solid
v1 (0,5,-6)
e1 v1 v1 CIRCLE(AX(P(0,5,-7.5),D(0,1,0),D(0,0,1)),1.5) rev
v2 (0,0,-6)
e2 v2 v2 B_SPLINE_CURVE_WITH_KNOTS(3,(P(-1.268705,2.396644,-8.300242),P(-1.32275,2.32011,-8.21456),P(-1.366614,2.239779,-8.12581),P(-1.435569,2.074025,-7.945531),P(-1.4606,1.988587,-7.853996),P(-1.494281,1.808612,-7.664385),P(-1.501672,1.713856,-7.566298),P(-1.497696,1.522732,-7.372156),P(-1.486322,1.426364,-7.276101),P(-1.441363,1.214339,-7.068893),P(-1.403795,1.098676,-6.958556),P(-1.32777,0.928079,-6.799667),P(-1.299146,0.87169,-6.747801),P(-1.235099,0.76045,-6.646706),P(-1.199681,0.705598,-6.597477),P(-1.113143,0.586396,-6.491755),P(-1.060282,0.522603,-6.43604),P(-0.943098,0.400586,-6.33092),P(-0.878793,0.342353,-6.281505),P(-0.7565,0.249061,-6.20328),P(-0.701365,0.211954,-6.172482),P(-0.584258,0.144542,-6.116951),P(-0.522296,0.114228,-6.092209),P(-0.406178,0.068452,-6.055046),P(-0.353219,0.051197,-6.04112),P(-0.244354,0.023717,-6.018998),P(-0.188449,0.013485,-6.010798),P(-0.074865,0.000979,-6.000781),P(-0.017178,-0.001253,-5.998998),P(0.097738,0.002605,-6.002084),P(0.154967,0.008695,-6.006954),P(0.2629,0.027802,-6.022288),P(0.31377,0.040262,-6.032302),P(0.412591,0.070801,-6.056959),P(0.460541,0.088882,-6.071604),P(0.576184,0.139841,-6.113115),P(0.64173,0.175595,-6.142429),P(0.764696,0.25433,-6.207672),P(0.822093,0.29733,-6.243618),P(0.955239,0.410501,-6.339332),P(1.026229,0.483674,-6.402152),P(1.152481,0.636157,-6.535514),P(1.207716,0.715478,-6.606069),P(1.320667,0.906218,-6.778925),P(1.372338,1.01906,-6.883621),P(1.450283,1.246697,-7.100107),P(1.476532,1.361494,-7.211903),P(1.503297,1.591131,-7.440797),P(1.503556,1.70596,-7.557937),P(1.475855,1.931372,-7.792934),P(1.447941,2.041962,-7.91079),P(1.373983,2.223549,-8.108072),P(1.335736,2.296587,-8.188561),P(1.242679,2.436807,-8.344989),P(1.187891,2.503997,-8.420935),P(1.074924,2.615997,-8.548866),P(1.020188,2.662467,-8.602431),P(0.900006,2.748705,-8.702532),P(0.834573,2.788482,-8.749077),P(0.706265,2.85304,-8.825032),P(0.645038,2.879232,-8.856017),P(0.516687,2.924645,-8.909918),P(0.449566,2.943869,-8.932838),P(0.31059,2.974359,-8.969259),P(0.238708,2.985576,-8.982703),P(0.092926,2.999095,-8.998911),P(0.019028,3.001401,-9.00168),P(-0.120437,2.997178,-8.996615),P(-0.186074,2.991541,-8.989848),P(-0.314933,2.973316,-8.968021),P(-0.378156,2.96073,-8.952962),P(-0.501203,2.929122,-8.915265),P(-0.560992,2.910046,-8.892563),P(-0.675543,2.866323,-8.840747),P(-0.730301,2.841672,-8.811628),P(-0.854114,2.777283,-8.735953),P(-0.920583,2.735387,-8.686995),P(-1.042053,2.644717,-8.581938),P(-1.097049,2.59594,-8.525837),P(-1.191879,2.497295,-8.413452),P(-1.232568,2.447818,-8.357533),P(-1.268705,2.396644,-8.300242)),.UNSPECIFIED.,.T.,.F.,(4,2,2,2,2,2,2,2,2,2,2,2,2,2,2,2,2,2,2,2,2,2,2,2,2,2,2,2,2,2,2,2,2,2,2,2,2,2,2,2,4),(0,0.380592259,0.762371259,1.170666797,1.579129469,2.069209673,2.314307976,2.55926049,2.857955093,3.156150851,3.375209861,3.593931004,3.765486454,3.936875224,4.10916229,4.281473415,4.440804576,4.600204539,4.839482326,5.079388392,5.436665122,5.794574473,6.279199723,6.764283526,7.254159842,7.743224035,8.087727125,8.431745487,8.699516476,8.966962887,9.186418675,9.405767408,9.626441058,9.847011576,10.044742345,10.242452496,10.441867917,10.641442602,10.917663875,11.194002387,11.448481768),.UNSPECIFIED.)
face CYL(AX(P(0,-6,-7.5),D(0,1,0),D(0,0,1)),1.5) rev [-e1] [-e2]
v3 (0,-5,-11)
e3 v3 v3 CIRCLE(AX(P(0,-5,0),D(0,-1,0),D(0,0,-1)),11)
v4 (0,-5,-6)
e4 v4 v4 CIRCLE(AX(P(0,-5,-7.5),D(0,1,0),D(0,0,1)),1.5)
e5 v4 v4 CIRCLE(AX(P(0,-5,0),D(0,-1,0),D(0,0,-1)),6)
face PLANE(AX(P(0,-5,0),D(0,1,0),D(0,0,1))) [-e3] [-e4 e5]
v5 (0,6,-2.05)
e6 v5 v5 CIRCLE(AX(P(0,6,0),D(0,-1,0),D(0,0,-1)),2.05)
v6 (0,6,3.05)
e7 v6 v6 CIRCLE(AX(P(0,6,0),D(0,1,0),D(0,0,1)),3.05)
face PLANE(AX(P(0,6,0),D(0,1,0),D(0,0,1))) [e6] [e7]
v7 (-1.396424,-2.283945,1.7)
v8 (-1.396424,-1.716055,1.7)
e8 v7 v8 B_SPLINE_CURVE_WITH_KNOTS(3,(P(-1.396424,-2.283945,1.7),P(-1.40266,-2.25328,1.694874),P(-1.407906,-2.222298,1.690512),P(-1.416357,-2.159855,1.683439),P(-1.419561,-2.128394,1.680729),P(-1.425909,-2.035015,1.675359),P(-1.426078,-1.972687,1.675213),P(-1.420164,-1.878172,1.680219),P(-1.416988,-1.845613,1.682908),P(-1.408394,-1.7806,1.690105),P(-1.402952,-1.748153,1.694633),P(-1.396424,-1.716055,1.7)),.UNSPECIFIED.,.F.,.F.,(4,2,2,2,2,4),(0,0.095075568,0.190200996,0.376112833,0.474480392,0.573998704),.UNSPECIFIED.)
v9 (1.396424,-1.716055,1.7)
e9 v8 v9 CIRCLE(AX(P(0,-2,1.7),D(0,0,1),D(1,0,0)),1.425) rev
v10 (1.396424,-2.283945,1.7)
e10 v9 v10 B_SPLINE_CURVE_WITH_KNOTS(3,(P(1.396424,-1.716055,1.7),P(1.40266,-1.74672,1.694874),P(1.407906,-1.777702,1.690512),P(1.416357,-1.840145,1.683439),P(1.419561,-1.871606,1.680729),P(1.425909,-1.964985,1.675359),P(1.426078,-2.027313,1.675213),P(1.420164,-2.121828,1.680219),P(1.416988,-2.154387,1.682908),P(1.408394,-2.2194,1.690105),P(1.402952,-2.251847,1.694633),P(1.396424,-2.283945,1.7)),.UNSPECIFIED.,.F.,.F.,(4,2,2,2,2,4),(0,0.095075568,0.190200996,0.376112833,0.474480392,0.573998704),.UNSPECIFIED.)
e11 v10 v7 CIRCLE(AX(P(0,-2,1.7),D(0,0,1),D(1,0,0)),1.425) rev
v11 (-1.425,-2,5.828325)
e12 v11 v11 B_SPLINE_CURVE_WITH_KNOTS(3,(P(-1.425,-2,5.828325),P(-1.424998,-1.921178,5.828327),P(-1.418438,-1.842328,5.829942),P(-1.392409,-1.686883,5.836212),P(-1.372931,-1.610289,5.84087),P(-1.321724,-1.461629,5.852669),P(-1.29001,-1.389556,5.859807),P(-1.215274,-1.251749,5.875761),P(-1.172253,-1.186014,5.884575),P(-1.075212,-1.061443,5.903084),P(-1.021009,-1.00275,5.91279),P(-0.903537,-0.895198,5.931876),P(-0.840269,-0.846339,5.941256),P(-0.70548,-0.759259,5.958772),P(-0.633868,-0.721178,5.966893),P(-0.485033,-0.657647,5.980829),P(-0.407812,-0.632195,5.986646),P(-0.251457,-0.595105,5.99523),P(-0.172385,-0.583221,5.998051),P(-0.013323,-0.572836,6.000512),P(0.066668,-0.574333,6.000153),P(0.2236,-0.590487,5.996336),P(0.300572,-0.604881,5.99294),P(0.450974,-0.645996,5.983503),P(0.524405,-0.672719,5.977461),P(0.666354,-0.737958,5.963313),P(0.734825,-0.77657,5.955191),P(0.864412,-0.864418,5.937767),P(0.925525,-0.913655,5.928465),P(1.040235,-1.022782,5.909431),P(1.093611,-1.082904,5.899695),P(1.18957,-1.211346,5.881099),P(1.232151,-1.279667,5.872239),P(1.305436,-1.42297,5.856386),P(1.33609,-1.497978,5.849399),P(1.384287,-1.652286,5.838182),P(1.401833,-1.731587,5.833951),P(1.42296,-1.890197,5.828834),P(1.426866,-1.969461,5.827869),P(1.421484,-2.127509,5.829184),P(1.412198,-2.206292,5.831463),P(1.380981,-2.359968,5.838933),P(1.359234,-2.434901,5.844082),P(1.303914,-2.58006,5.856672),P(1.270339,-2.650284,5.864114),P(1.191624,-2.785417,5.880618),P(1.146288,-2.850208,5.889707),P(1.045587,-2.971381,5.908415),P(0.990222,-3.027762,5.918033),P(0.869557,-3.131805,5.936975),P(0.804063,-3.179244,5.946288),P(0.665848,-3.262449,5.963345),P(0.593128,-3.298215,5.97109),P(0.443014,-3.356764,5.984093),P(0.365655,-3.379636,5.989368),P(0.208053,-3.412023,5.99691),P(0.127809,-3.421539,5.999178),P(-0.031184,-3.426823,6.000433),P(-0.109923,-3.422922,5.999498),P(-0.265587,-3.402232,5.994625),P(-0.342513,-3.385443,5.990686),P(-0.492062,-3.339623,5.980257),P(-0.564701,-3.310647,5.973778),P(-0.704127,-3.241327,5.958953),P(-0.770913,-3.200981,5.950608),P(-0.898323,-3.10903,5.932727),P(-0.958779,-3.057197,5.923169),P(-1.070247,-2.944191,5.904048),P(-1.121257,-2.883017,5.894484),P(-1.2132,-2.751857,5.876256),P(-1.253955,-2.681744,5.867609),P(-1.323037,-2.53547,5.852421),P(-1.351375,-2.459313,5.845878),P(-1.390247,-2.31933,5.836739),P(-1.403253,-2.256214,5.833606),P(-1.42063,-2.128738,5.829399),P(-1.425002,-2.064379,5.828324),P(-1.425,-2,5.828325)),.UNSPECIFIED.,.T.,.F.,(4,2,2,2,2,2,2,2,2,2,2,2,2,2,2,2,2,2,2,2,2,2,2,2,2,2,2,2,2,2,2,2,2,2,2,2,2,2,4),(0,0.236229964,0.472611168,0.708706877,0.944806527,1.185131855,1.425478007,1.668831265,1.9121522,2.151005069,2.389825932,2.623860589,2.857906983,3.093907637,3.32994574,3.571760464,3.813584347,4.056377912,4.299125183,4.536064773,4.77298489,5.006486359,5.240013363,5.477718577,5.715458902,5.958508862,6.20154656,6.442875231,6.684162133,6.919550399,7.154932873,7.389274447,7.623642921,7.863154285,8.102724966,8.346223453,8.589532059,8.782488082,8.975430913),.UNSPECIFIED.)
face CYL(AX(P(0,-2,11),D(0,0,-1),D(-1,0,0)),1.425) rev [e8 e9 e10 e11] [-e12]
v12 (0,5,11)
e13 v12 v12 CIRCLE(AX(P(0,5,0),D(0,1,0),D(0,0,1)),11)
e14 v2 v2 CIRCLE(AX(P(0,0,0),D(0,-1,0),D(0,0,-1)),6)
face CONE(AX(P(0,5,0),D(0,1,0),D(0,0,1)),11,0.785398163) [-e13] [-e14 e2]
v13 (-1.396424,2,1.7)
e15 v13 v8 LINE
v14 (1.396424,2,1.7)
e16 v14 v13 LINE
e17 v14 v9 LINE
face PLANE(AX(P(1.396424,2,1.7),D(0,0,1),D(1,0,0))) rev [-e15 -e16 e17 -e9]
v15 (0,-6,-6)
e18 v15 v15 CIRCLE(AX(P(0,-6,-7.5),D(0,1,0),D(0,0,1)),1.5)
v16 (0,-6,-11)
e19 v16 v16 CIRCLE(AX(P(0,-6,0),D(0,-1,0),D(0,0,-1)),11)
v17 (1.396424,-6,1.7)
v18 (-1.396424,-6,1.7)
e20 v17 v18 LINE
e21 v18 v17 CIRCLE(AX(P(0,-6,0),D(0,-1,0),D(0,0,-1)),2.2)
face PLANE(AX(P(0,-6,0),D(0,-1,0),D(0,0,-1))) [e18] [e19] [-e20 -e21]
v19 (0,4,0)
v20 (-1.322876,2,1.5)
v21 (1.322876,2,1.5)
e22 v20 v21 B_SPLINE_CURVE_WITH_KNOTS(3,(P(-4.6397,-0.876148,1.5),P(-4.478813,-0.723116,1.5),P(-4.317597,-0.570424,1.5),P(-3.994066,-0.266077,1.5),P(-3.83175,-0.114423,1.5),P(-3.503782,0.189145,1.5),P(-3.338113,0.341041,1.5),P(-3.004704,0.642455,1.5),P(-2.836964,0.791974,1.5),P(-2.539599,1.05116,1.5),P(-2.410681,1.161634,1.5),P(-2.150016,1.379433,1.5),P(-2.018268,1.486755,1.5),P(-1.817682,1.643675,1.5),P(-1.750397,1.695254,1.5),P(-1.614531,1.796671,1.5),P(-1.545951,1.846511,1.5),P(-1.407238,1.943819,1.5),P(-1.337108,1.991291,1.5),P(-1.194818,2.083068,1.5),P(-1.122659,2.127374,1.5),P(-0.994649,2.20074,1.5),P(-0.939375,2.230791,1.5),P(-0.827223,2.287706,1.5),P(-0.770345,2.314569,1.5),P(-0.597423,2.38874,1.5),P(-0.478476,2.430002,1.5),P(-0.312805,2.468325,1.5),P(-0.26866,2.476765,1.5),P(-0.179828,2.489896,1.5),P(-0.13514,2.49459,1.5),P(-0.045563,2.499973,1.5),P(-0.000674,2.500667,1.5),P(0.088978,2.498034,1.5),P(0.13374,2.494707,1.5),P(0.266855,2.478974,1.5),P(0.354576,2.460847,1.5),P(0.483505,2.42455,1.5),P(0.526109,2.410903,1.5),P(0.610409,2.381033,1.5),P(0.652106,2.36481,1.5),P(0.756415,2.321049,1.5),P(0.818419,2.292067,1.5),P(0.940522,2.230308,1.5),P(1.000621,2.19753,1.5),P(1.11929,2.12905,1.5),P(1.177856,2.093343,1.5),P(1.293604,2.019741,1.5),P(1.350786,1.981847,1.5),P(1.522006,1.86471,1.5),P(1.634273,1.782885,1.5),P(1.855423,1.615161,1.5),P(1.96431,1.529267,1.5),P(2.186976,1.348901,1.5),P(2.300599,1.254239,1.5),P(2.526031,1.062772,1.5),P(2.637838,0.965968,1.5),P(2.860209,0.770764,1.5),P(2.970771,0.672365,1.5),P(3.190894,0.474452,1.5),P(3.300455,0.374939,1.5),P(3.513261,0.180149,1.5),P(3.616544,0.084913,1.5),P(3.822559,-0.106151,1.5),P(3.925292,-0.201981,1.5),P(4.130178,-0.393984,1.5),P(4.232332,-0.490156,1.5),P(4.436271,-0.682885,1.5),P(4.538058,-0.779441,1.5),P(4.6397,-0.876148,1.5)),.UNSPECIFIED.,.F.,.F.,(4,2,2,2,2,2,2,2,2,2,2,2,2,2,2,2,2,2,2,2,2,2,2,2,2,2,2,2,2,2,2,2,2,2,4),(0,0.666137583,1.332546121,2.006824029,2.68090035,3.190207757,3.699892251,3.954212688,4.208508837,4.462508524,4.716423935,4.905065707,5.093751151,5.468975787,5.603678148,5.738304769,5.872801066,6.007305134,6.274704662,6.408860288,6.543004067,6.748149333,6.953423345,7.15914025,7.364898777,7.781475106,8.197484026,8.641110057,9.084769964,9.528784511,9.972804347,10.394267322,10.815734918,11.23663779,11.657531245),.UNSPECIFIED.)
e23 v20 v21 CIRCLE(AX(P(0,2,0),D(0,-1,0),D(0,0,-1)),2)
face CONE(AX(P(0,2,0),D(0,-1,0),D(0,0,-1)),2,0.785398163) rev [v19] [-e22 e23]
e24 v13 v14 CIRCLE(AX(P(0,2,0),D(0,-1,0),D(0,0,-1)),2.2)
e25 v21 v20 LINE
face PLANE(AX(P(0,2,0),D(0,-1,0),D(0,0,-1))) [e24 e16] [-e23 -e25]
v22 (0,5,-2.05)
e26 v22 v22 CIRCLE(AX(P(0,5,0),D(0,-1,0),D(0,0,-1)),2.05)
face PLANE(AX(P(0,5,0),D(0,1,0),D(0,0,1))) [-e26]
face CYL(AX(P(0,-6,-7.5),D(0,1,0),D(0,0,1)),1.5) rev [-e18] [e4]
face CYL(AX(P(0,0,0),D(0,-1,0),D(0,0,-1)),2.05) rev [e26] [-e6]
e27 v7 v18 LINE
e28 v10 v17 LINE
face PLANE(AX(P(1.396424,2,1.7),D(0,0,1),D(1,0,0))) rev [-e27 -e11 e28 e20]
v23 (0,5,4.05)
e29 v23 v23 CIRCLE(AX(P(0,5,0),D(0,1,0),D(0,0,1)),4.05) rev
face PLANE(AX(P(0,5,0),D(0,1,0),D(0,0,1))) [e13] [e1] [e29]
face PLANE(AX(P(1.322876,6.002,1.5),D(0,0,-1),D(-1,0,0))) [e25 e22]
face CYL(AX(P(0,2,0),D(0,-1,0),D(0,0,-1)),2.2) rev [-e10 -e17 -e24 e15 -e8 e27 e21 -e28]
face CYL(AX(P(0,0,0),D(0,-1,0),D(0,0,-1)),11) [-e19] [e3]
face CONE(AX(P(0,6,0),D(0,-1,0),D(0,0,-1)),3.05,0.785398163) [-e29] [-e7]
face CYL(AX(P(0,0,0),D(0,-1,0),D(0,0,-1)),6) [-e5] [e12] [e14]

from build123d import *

# Parameters (mm, degrees)
FLAT_GROVE_EXTRUDE_REACH   = 21.647
WIRE_HOLE_CUT_DEPTH        = 20.052558883
WIRE_HOLE_CUT_DEPTH_BACK   = 20.052558883
SKETCH5_R                  = 1.5
SKETCH6_R                  = 1.425
SET_SCREW_CUT_DEPTH        = 18.698870187
MAGNET_START               = -1
SKETCH8_R                  = 11
SKETCH8_R_2                = 3.05
MAGNET_HOLDER_TRIM_DEPTH   = 1
MAGNET_HOLDER_CHAMFER_SIZE = 1
AXLE_TOLERANCE_CUT_DEPTH   = 8


with BuildPart() as part:
    # Sketch1 → Spool Solid (revolve)
    with BuildSketch(Plane(origin=(0, 0, 0), x_dir=(0, 0, -1), z_dir=(1, 0, 0)), mode=Mode.PRIVATE) as spool_solid_sk:
        Polygon((-2.05, 6), (-11, 6), (-11, 5), (-6, 0), (-6, -5), (-11, -5), (-11, -6), (-2, -6), (-2, 2), (0, 4), (0, 5), (-2.05, 5), align=None)
    revolve(spool_solid_sk.sketch.rotate(Axis((0, 0, 0), (0, 1, 0)), 180), axis=Axis((0, 0, 0), (0, 1, 0)))

    # Flat Grove Extrude: up to this cone (the profile starts inside it)
    flat_grove_extrude_end = Plane(origin=(0, -6, 0), z_dir=(0, -1, 0)).offset(-9.999999) * Cone(1e-06, 42.147, 42.146999, align=(Align.CENTER, Align.CENTER, Align.MIN), mode=Mode.PRIVATE)
    # Sketch2 → Flat Grove Extrude (add, up to the surface)
    with BuildSketch(Plane.XZ.offset(6), mode=Mode.PRIVATE) as flat_grove_extrude_sk1:
        with BuildLine():
            Line((1.322875656, 1.5), (-1.322875656, 1.5))
            ThreePointArc((-1.322875656, 1.5), (0, 2), (1.322875656, 1.5))
        make_face()
    flat_grove_extrude_tool1 = extrude(flat_grove_extrude_sk1.sketch, amount=-FLAT_GROVE_EXTRUDE_REACH, mode=Mode.PRIVATE) & flat_grove_extrude_end
    add(flat_grove_extrude_tool1.solids().sort_by_distance((0, -6, 1.702311))[0])

    # Sketch5 → Wire Hole Cut (cut, two sides: drawn at the far end of the back side and taken through both)
    with BuildSketch(Plane(origin=(0, -5, 0), x_dir=(1, 0, 0), z_dir=(0, 1, 0)).offset(-WIRE_HOLE_CUT_DEPTH_BACK)):
        with Locations(Location((0, 7.5, 0), (0, 0, 270))):
            Circle(SKETCH5_R)
    extrude(amount=WIRE_HOLE_CUT_DEPTH + WIRE_HOLE_CUT_DEPTH_BACK, mode=Mode.SUBTRACT)

    # Sketch6 → Set Screw Cut (cut, through all)
    with BuildSketch(Plane(origin=(0, 0, 1.5), x_dir=(-1, 0, 0), z_dir=(0, 0, -1))):
        with Locations((0, -2)):
            Circle(SKETCH6_R)
    extrude(amount=-SET_SCREW_CUT_DEPTH, mode=Mode.SUBTRACT)

    # Sketch8 → Magnet Holder Trim (cut)
    with BuildSketch(Plane(origin=(0, 6, 0), x_dir=(1, 0, 0), z_dir=(0, 1, 0)).offset(MAGNET_START)):
        with Locations(Location((0, 0, 0), (0, 0, 90))):
            Circle(SKETCH8_R)
        with Locations(Location((0, 0, 0), (0, 0, 270))):
            Circle(SKETCH8_R_2, mode=Mode.SUBTRACT)
    extrude(amount=MAGNET_HOLDER_TRIM_DEPTH, mode=Mode.SUBTRACT)

    # Magnet Holder Chamfer
    magnet_holder_chamfer_edges = [part.edges().sort_by_distance(p)[0] for p in [
        (0, 5, -3.05),
    ]]
    chamfer(magnet_holder_chamfer_edges, length=MAGNET_HOLDER_CHAMFER_SIZE - 0.0001)  # a hair under: the kernel refuses the full size

    # Sketch9 → Axle Tolerance Cut (cut)
    with BuildSketch(Plane.XZ.offset(6)):
        with BuildLine():
            Line((1.396424004, 1.7), (-1.396424004, 1.7))
            ThreePointArc((-1.396424004, 1.7), (0, -2.2), (1.396424004, 1.7))
        make_face()
    extrude(amount=-AXLE_TOLERANCE_CUT_DEPTH, mode=Mode.SUBTRACT)


solid = part.part
